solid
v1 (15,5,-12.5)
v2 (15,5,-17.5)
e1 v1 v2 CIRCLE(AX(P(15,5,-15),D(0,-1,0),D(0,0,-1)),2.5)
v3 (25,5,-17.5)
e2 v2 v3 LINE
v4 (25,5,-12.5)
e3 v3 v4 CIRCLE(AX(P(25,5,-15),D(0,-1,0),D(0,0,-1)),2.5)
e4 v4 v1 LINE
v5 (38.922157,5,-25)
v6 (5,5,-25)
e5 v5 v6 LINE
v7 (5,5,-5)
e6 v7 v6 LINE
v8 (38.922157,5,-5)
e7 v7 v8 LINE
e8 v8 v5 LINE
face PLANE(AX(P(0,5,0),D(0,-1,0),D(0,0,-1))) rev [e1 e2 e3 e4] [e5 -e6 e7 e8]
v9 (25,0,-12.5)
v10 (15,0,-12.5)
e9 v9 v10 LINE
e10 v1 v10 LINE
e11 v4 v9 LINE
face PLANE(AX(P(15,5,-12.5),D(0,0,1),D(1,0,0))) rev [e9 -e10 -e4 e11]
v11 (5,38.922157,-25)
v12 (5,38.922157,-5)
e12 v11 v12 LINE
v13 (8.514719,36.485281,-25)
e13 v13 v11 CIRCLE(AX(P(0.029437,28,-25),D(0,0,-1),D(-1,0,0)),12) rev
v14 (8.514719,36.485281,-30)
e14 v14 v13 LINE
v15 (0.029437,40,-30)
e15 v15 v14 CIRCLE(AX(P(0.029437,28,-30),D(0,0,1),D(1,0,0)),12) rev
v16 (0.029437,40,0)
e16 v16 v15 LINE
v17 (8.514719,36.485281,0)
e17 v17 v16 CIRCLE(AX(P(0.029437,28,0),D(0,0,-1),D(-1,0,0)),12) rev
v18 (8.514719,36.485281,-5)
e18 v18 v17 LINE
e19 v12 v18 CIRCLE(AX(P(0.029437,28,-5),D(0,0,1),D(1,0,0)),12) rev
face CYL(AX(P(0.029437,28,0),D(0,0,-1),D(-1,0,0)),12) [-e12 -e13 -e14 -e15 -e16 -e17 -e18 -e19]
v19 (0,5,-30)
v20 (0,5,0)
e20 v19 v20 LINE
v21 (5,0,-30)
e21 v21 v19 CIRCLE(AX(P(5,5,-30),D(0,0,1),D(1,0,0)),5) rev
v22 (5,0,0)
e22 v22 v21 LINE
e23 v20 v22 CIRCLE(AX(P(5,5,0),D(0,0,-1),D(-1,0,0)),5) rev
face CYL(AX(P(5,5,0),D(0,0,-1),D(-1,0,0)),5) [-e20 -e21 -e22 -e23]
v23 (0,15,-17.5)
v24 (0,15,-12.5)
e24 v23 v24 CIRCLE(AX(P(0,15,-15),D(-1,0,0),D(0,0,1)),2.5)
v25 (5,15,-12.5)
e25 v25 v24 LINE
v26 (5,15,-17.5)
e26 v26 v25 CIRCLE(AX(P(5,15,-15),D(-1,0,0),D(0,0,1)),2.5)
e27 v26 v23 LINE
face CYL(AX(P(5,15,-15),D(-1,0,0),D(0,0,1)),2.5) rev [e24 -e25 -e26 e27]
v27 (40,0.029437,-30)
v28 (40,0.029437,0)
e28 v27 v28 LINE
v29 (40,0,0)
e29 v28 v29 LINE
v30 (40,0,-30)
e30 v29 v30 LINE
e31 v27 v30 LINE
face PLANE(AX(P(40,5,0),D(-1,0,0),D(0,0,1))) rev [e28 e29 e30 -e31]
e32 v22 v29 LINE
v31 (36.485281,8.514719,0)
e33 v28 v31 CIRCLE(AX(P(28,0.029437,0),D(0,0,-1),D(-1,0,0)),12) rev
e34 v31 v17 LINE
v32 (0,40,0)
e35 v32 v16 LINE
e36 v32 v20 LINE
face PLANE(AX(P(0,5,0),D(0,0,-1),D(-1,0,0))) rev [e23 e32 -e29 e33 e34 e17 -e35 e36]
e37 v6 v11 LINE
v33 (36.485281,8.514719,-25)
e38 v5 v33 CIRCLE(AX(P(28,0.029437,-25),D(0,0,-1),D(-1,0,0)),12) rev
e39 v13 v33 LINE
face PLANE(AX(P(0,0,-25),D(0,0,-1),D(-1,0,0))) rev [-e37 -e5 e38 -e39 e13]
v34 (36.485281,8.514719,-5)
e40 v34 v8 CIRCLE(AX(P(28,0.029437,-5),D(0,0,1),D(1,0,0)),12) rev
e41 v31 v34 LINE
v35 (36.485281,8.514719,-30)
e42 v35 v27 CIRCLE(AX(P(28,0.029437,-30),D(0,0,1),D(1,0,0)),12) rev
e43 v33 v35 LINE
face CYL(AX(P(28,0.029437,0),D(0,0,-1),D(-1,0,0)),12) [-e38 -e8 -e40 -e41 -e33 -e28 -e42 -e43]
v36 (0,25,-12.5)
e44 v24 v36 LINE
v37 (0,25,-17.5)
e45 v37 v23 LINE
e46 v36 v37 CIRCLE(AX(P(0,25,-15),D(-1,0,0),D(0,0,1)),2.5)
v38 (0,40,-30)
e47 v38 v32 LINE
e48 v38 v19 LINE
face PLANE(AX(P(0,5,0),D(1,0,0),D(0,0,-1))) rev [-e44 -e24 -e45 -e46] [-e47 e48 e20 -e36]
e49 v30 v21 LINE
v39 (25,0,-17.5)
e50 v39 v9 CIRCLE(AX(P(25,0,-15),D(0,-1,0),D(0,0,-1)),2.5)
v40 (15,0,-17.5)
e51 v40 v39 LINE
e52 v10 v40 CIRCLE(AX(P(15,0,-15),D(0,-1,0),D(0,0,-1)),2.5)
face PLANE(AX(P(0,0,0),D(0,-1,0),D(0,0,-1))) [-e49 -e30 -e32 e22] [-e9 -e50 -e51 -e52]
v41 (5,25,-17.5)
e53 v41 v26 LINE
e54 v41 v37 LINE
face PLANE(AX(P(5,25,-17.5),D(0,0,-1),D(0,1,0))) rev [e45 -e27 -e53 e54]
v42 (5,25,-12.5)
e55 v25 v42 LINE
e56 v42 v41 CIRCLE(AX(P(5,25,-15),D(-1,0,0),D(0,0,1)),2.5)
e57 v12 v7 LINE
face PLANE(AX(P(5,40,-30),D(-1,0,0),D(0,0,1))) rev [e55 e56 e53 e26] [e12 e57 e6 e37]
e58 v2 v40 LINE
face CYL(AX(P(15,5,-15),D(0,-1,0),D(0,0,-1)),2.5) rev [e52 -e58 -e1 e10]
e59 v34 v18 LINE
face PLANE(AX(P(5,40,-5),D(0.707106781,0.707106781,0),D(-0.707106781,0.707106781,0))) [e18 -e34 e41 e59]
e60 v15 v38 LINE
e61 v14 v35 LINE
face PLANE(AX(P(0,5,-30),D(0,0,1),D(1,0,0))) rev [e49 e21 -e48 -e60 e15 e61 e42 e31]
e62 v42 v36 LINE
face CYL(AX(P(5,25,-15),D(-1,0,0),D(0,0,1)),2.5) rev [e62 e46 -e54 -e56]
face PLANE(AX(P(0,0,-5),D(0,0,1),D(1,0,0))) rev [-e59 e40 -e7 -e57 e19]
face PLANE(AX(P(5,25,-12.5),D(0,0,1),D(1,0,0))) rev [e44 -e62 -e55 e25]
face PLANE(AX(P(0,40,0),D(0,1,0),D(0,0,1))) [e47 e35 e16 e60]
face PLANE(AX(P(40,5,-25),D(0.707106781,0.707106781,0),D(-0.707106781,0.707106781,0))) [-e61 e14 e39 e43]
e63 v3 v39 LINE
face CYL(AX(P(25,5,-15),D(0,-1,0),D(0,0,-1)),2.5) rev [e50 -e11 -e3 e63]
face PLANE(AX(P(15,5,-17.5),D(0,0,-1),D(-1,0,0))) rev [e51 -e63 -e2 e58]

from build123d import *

# Parameters (mm, degrees)
SKETCH1_W           = 40
SKETCH1_H           = 30
BOSS_EXTRUDE1_DEPTH = 5
SKETCH2_W           = 5
SKETCH2_H           = 30
BOSS_EXTRUDE2_DEPTH = 35
BOSS_EXTRUDE3_DEPTH = 5
BOSS_EXTRUDE4_DEPTH = 5
CUT_EXTRUDE1_DEPTH  = 5
CUT_EXTRUDE2_DEPTH  = 5
FILLET4_R           = 12
FILLET5_R           = 12
FILLET6_R           = 5


with BuildPart() as part:
    # Sketch1 → Boss-Extrude1 (new body)
    with BuildSketch(Plane(origin=(0, 0, 0), x_dir=(1, 0, 0), z_dir=(0, 1, 0))):
        with Locations((20, 15)):
            Rectangle(SKETCH1_W, SKETCH1_H)
    extrude(amount=BOSS_EXTRUDE1_DEPTH)

    # Sketch2 → Boss-Extrude2 (add)
    with BuildSketch(Plane(origin=(0, 5, 0), x_dir=(1, 0, 0), z_dir=(0, 1, 0))):
        with Locations((2.5, 15)):
            Rectangle(SKETCH2_W, SKETCH2_H)
    extrude(amount=BOSS_EXTRUDE2_DEPTH)

    # Sketch3 → Boss-Extrude3 (add)
    with BuildSketch(Plane.XY):
        Polygon((5, 40), (40, 5), (5, 5), align=None)
    extrude(amount=-BOSS_EXTRUDE3_DEPTH)

    # Sketch4 → Boss-Extrude4 (add)
    with BuildSketch(Plane(origin=(0, 0, -30), x_dir=(-1, 0, 0), z_dir=(0, 0, -1))):
        Polygon((-40, 5), (-5, 40), (-5, 5), align=None)
    extrude(amount=-BOSS_EXTRUDE4_DEPTH)

    # Sketch5 → Cut-Extrude1 (cut)
    with BuildSketch(Plane.XZ):
        with BuildLine():
            Line((15, -12.5), (25, -12.5))
            ThreePointArc((25, -12.5), (27.5, -15), (25, -17.5))
            Line((25, -17.5), (15, -17.5))
            ThreePointArc((15, -17.5), (12.5, -15), (15, -12.5))
        make_face()
    extrude(amount=-CUT_EXTRUDE1_DEPTH, mode=Mode.SUBTRACT)

    # Sketch6 → Cut-Extrude2 (cut)
    with BuildSketch(Plane.ZY):
        with BuildLine():
            Line((-12.5, 25), (-12.5, 15))
            ThreePointArc((-12.5, 15), (-15, 12.5), (-17.5, 15))
            Line((-17.5, 15), (-17.5, 25))
            ThreePointArc((-17.5, 25), (-15, 27.5), (-12.5, 25))
        make_face()
    extrude(amount=-CUT_EXTRUDE2_DEPTH, mode=Mode.SUBTRACT)

    # Fillet4
    # the kernel refuses this fillet: 12 mm, written as the material it takes off along each edge
    with BuildSketch(Plane(origin=(40, 5, 12.426406871), x_dir=(-0.7071067811865481, 0.707106781186547, 0), z_dir=(0, 0, -1))) as fillet4_piece_1:
        with BuildLine():
            CenterArc((FILLET4_R * 0.414213562373, -FILLET4_R), FILLET4_R, 90, 45)
            Line((-FILLET4_R * 0.292893218813, -FILLET4_R * 0.292893218813), (0, 0))
            Line((0, 0), (FILLET4_R * 0.414213562373, 0))
        make_face()
    extrude(amount=29.852813742, mode=Mode.SUBTRACT)
    with BuildSketch(Plane(origin=(40, 5, -12.573593129), x_dir=(0, -1, 0), z_dir=(0, 0, -1))) as fillet4_piece_2:
        with BuildLine():
            CenterArc((FILLET4_R * 0.414213562373, FILLET4_R), FILLET4_R, 225, 45)
            Line((-FILLET4_R * 0.292893218813, FILLET4_R * 0.292893218813), (0, 0))
            Line((0, 0), (FILLET4_R * 0.414213562373, 0))
        make_face()
    extrude(amount=29.852813742, mode=Mode.SUBTRACT)

    # Fillet5
    # the kernel refuses this fillet: 12 mm, written as the material it takes off along each edge
    with BuildSketch(Plane(origin=(5, 40, -17.426406871), x_dir=(-1, 0, 0), z_dir=(0, 0, 1)), Plane(origin=(5, 40, -42.426406871), x_dir=(-1, 0, 0), z_dir=(0, 0, 1))) as fillet5_piece_1:
        with BuildLine():
            CenterArc((FILLET5_R * 0.414213562373, FILLET5_R), FILLET5_R, 225, 45)
            Line((-FILLET5_R * 0.292893218813, FILLET5_R * 0.292893218813), (0, 0))
            Line((0, 0), (FILLET5_R * 0.414213562373, 0))
        make_face()
    extrude(amount=29.852813742, mode=Mode.SUBTRACT)

    # Fillet6
    fillet6_edges = [part.edges().sort_by_distance(p)[0] for p in [
        (0, 0, -15),
    ]]
    fillet(fillet6_edges, radius=FILLET6_R)


solid = part.part
